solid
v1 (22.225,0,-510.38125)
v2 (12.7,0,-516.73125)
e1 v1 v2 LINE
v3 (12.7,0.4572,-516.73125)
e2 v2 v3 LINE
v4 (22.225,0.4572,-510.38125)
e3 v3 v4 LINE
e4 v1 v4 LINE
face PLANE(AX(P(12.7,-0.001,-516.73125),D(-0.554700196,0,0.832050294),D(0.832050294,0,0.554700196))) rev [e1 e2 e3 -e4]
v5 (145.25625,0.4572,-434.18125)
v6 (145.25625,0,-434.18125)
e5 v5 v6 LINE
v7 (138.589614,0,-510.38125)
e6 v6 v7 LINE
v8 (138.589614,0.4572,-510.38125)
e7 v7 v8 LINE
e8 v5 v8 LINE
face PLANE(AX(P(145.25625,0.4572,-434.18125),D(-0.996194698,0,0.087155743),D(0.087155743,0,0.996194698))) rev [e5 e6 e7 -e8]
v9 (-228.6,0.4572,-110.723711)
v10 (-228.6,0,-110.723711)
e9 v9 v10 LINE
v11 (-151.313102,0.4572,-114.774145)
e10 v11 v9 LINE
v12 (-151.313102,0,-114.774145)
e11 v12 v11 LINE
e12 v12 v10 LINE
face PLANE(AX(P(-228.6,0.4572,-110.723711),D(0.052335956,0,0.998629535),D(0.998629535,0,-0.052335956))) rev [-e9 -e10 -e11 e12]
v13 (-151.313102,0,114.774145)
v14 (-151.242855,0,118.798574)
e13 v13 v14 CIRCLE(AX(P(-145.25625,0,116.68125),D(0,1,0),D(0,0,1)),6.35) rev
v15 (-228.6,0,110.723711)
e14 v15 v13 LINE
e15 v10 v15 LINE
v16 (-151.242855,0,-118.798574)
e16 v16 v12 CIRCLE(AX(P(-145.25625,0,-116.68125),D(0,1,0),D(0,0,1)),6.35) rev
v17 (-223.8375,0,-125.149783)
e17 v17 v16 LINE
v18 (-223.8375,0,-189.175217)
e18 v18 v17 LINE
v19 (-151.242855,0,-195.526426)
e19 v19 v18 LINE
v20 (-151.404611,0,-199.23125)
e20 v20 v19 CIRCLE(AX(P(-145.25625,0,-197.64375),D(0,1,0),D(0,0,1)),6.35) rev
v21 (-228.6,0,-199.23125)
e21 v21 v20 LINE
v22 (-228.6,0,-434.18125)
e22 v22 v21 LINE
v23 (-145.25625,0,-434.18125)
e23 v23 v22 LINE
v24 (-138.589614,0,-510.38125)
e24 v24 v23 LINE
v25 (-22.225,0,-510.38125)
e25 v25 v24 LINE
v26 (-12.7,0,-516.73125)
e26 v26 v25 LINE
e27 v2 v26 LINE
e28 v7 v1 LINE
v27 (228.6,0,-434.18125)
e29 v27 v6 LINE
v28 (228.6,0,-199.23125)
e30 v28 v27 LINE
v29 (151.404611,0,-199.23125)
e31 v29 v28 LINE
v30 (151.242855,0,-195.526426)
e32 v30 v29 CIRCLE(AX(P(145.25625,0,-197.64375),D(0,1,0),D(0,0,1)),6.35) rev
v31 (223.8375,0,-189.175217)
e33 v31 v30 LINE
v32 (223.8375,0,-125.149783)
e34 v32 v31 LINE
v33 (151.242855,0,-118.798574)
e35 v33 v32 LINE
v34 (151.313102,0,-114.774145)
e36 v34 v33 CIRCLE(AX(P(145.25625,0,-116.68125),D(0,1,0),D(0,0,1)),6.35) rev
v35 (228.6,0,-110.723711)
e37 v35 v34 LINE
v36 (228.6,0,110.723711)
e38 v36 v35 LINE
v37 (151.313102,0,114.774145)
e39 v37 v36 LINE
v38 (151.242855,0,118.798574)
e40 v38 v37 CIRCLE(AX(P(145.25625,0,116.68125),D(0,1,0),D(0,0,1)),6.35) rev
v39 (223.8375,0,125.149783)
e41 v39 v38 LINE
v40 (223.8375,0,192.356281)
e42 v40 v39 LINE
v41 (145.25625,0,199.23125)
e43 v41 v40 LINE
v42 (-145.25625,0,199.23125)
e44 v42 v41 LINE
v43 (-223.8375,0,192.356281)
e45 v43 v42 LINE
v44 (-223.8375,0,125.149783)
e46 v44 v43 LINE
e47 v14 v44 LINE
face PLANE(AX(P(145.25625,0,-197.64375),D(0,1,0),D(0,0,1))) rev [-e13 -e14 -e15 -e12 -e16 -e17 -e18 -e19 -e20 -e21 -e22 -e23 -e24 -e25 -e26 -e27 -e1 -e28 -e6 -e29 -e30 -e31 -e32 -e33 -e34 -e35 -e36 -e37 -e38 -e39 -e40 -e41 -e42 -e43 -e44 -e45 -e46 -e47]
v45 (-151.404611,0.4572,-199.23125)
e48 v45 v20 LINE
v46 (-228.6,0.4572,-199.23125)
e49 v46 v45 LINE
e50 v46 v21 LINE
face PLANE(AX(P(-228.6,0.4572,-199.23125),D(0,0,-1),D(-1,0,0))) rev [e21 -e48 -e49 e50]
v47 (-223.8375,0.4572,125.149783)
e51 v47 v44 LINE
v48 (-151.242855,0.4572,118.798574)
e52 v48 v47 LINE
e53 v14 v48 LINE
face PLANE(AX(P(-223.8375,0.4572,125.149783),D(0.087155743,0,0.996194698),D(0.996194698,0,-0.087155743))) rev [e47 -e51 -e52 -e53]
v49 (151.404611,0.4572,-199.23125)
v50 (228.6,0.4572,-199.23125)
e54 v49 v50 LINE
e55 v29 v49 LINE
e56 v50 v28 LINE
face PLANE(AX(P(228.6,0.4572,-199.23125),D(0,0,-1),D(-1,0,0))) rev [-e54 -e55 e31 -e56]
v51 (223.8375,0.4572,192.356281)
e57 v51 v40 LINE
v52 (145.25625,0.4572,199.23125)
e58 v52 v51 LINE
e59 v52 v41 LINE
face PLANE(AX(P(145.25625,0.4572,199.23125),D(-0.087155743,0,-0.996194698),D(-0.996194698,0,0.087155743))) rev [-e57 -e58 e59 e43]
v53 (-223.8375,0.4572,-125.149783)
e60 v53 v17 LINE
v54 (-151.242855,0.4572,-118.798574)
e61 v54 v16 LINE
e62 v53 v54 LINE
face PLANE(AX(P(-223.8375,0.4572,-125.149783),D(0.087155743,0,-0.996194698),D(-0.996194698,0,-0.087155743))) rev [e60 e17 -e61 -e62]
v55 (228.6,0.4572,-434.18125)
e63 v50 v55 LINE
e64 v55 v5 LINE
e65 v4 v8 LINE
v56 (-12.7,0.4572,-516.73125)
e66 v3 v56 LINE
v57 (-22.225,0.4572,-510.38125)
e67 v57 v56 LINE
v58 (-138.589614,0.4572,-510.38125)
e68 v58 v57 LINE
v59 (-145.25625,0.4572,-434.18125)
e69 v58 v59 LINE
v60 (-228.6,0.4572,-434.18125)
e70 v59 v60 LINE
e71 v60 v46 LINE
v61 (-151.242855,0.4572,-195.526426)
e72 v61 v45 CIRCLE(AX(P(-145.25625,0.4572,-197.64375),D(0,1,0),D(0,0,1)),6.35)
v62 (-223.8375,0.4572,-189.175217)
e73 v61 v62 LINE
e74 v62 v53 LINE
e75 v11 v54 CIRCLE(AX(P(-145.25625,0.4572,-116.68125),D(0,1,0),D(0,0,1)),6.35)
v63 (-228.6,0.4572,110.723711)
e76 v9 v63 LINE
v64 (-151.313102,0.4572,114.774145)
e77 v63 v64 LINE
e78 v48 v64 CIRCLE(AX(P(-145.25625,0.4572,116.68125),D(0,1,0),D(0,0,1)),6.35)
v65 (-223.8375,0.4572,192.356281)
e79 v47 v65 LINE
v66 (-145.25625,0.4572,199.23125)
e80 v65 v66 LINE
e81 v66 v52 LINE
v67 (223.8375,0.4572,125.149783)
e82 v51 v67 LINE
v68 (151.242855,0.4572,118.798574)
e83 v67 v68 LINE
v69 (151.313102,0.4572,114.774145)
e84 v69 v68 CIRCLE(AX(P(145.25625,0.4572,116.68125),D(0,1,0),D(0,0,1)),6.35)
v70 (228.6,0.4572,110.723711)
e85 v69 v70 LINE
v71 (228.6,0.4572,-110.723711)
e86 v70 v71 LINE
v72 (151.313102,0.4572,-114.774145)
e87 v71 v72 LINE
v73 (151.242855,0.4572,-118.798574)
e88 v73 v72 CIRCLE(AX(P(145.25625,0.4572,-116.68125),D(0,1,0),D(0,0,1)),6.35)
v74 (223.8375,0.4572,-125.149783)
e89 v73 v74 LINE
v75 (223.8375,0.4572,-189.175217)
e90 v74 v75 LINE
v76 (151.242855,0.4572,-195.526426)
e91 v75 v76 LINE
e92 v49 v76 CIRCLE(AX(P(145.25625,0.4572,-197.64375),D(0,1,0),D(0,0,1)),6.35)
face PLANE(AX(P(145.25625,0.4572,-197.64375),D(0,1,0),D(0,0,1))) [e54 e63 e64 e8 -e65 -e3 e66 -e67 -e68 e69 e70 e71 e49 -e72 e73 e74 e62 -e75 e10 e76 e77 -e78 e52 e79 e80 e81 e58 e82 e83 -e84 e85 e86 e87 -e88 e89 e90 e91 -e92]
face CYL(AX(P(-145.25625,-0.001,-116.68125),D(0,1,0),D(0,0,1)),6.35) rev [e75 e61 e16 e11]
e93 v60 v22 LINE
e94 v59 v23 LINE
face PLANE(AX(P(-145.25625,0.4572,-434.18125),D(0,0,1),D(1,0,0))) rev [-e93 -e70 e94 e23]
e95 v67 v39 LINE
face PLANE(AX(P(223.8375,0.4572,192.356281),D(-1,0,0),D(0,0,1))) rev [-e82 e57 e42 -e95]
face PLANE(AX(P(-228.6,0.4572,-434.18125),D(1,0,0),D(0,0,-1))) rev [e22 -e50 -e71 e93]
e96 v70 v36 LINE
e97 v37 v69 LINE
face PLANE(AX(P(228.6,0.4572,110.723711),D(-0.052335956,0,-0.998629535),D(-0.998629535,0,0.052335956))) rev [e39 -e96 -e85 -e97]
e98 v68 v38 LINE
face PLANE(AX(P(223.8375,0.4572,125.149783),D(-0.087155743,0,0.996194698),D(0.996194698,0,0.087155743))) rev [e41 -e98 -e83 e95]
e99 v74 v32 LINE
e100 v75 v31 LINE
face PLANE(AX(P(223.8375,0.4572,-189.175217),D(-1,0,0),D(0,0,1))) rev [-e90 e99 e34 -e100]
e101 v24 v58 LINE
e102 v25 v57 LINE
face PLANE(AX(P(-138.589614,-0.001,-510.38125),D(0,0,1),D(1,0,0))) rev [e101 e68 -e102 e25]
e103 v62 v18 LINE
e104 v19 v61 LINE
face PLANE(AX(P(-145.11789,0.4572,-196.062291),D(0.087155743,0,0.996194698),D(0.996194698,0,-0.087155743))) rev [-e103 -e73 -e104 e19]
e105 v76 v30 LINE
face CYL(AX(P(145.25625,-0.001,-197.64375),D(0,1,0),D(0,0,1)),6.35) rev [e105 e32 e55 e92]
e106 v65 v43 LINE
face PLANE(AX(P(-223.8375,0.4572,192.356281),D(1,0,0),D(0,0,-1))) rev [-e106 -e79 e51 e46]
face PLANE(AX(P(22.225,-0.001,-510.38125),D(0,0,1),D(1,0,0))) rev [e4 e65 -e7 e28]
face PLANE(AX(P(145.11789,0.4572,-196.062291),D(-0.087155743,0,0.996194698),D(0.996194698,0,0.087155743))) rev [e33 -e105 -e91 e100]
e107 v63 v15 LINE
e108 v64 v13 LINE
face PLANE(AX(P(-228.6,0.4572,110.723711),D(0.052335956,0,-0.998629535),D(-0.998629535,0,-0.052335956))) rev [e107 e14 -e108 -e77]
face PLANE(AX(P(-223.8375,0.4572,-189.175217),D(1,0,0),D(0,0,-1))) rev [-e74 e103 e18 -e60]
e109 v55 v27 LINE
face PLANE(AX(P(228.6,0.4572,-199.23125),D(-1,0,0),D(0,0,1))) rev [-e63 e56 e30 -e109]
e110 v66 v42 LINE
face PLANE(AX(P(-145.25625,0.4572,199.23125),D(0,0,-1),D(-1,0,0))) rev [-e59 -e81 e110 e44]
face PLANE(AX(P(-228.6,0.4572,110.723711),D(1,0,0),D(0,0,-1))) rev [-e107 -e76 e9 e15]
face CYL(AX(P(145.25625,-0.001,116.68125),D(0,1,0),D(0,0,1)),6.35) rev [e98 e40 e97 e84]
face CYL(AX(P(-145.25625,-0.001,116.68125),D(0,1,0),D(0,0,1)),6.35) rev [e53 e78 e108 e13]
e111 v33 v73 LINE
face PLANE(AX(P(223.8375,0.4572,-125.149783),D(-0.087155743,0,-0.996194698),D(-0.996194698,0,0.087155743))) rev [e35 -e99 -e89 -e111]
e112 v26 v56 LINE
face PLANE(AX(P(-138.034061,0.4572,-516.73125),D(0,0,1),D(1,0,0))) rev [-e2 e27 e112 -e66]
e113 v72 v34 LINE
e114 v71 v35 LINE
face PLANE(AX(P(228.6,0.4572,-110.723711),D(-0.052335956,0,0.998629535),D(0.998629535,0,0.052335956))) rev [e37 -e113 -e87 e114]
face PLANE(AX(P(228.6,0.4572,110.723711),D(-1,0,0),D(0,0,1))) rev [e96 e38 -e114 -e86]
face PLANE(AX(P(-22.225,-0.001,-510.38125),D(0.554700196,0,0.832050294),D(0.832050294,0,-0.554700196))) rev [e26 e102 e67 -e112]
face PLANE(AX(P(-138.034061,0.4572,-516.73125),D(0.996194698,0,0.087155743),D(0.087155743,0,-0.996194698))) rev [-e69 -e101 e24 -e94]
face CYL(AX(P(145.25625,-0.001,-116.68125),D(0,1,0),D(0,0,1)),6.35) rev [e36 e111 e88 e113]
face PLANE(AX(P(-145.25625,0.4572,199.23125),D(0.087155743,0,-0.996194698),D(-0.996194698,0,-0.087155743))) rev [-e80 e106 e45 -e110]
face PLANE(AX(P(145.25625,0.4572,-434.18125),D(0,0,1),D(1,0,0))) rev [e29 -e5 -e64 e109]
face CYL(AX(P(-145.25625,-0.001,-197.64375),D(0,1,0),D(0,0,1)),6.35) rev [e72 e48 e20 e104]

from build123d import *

# Parameters (mm, degrees)
EXTRUDE1_DEPTH = 0.4572
EXTRUDE2_REACH = 567.039
SKETCH2_R      = 6.35
EXTRUDE3_REACH = 567.039


with BuildPart() as part:
    # Sketch1 → Extrude1 (new body)
    with BuildSketch(Plane(origin=(0, 0, 0), x_dir=(1, 0, 0), z_dir=(0, 1, 0))):
        with BuildLine():
            Line((145.25625, 434.18125), (138.034060826, 516.73125))
            Line((138.034060826, 516.73125), (-138.034060826, 516.73125))
            Line((-138.034060826, 516.73125), (-145.25625, 434.18125))
            Line((-145.25625, 434.18125), (-228.6, 434.18125))
            Line((-228.6, 434.18125), (-228.6, 199.23125))
            Line((-228.6, 199.23125), (-145.25625, 199.23125))
            ThreePointArc((-145.25625, 199.23125), (-143.670260948, 197.712995777), (-145.117890258, 196.062290917))
            Line((-145.117890258, 196.062290917), (-223.8375, 189.175217467))
            Line((-223.8375, 189.175217467), (-223.8375, 125.149782533))
            Line((-223.8375, 125.149782533), (-145.117890258, 118.262709083))
            ThreePointArc((-145.117890258, 118.262709083), (-143.668991784, 116.653544305), (-145.173166669, 115.095925614))
            Line((-145.173166669, 115.095925614), (-228.6, 110.723710546))
            Line((-228.6, 110.723710546), (-228.6, -110.723710546))
            Line((-228.6, -110.723710546), (-145.173166669, -115.095925614))
            ThreePointArc((-145.173166669, -115.095925614), (-143.668991784, -116.653544305), (-145.117890258, -118.262709083))
            Line((-145.117890258, -118.262709083), (-223.8375, -125.149782533))
            Line((-223.8375, -125.149782533), (-223.8375, -192.356281459))
            Line((-223.8375, -192.356281459), (-145.25625, -199.23125))
            Line((-145.25625, -199.23125), (145.25625, -199.23125))
            Line((145.25625, -199.23125), (223.8375, -192.356281459))
            Line((223.8375, -192.356281459), (223.8375, -125.149782533))
            Line((223.8375, -125.149782533), (145.117890258, -118.262709083))
            ThreePointArc((145.117890258, -118.262709083), (143.668991784, -116.653544305), (145.173166669, -115.095925614))
            Line((145.173166669, -115.095925614), (228.6, -110.723710546))
            Line((228.6, -110.723710546), (228.6, 110.723710546))
            Line((228.6, 110.723710546), (145.173166669, 115.095925614))
            ThreePointArc((145.173166669, 115.095925614), (143.668991784, 116.653544305), (145.117890258, 118.262709083))
            Line((145.117890258, 118.262709083), (223.8375, 125.149782533))
            Line((223.8375, 125.149782533), (223.8375, 189.175217467))
            Line((223.8375, 189.175217467), (145.117890258, 196.062290917))
            ThreePointArc((145.117890258, 196.062290917), (143.670260948, 197.712995777), (145.25625, 199.23125))
            Line((145.25625, 199.23125), (228.6, 199.23125))
            Line((228.6, 199.23125), (228.6, 434.18125))
            Line((228.6, 434.18125), (145.25625, 434.18125))
        make_face()
    extrude(amount=EXTRUDE1_DEPTH)

    # Sketch2 → Extrude2 (cut, up to next)
    with BuildSketch(Plane(origin=(0, 0.4572, 0), x_dir=(1, 0, 0), z_dir=(0, 1, 0)), mode=Mode.PRIVATE) as extrude2_sk1:
        with Locations((-145.25625, 116.68125)):
            Circle(SKETCH2_R)
    extrude2_tool1 = extrude(extrude2_sk1.sketch, amount=-EXTRUDE2_REACH, mode=Mode.PRIVATE) & part.part
    # Sketch2 → Extrude2 (cut, up to next)
    with BuildSketch(Plane(origin=(0, 0.4572, 0), x_dir=(1, 0, 0), z_dir=(0, 1, 0)), mode=Mode.PRIVATE) as extrude2_sk2:
        with Locations((-145.25625, -116.68125)):
            Circle(SKETCH2_R)
    extrude2_tool2 = extrude(extrude2_sk2.sketch, amount=-EXTRUDE2_REACH, mode=Mode.PRIVATE) & part.part
    # Sketch2 → Extrude2 (cut, up to next)
    with BuildSketch(Plane(origin=(0, 0.4572, 0), x_dir=(1, 0, 0), z_dir=(0, 1, 0)), mode=Mode.PRIVATE) as extrude2_sk3:
        with Locations((145.25625, -116.68125)):
            Circle(SKETCH2_R)
    extrude2_tool3 = extrude(extrude2_sk3.sketch, amount=-EXTRUDE2_REACH, mode=Mode.PRIVATE) & part.part
    # Sketch2 → Extrude2 (cut, up to next)
    with BuildSketch(Plane(origin=(0, 0.4572, 0), x_dir=(1, 0, 0), z_dir=(0, 1, 0)), mode=Mode.PRIVATE) as extrude2_sk4:
        with Locations((145.25625, 116.68125)):
            Circle(SKETCH2_R)
    extrude2_tool4 = extrude(extrude2_sk4.sketch, amount=-EXTRUDE2_REACH, mode=Mode.PRIVATE) & part.part
    # Sketch2 → Extrude2 (cut, up to next)
    with BuildSketch(Plane(origin=(0, 0.4572, 0), x_dir=(1, 0, 0), z_dir=(0, 1, 0)), mode=Mode.PRIVATE) as extrude2_sk5:
        with Locations((-145.25625, 197.64375)):
            Circle(SKETCH2_R)
    extrude2_tool5 = extrude(extrude2_sk5.sketch, amount=-EXTRUDE2_REACH, mode=Mode.PRIVATE) & part.part
    # Sketch2 → Extrude2 (cut, up to next)
    with BuildSketch(Plane(origin=(0, 0.4572, 0), x_dir=(1, 0, 0), z_dir=(0, 1, 0)), mode=Mode.PRIVATE) as extrude2_sk6:
        with Locations((145.25625, 197.64375)):
            Circle(SKETCH2_R)
    extrude2_tool6 = extrude(extrude2_sk6.sketch, amount=-EXTRUDE2_REACH, mode=Mode.PRIVATE) & part.part
    add(extrude2_tool1.solids().sort_by_distance((-145.25625, 0.4572, -116.68125))[0], mode=Mode.SUBTRACT)
    add(extrude2_tool2.solids().sort_by_distance((-145.25625, 0.4572, 116.68125))[0], mode=Mode.SUBTRACT)
    add(extrude2_tool3.solids().sort_by_distance((145.25625, 0.4572, 116.68125))[0], mode=Mode.SUBTRACT)
    add(extrude2_tool4.solids().sort_by_distance((145.25625, 0.4572, -116.68125))[0], mode=Mode.SUBTRACT)
    add(extrude2_tool5.solids().sort_by_distance((-145.25625, 0.4572, -197.64375))[0], mode=Mode.SUBTRACT)
    add(extrude2_tool6.solids().sort_by_distance((145.25625, 0.4572, -197.64375))[0], mode=Mode.SUBTRACT)

    # Sketch12 → Extrude3 (cut, up to next)
    with BuildSketch(Plane(origin=(0, 0.4572, 0), x_dir=(1, 0, 0), z_dir=(0, 1, 0)), mode=Mode.PRIVATE) as extrude3_sk1:
        Polygon((-138.589613839, 510.38125), (-22.225, 510.38125), (-12.7, 516.73125), (-138.034060826, 516.73125), align=None)
    extrude3_tool1 = extrude(extrude3_sk1.sketch, amount=-EXTRUDE3_REACH, mode=Mode.PRIVATE) & part.part
    # Sketch12 → Extrude3 (cut, up to next)
    with BuildSketch(Plane(origin=(0, 0.4572, 0), x_dir=(1, 0, 0), z_dir=(0, 1, 0)), mode=Mode.PRIVATE) as extrude3_sk2:
        Polygon((12.7, 516.73125), (22.225, 510.38125), (138.589613839, 510.38125), (138.034060826, 516.73125), align=None)
    extrude3_tool2 = extrude(extrude3_sk2.sketch, amount=-EXTRUDE3_REACH, mode=Mode.PRIVATE) & part.part
    add(extrude3_tool1.solids().sort_by_distance((-77.855995, 0.4572, -513.595525))[0], mode=Mode.SUBTRACT)
    add(extrude3_tool2.solids().sort_by_distance((77.855995, 0.4572, -513.595525))[0], mode=Mode.SUBTRACT)


solid = part.part
